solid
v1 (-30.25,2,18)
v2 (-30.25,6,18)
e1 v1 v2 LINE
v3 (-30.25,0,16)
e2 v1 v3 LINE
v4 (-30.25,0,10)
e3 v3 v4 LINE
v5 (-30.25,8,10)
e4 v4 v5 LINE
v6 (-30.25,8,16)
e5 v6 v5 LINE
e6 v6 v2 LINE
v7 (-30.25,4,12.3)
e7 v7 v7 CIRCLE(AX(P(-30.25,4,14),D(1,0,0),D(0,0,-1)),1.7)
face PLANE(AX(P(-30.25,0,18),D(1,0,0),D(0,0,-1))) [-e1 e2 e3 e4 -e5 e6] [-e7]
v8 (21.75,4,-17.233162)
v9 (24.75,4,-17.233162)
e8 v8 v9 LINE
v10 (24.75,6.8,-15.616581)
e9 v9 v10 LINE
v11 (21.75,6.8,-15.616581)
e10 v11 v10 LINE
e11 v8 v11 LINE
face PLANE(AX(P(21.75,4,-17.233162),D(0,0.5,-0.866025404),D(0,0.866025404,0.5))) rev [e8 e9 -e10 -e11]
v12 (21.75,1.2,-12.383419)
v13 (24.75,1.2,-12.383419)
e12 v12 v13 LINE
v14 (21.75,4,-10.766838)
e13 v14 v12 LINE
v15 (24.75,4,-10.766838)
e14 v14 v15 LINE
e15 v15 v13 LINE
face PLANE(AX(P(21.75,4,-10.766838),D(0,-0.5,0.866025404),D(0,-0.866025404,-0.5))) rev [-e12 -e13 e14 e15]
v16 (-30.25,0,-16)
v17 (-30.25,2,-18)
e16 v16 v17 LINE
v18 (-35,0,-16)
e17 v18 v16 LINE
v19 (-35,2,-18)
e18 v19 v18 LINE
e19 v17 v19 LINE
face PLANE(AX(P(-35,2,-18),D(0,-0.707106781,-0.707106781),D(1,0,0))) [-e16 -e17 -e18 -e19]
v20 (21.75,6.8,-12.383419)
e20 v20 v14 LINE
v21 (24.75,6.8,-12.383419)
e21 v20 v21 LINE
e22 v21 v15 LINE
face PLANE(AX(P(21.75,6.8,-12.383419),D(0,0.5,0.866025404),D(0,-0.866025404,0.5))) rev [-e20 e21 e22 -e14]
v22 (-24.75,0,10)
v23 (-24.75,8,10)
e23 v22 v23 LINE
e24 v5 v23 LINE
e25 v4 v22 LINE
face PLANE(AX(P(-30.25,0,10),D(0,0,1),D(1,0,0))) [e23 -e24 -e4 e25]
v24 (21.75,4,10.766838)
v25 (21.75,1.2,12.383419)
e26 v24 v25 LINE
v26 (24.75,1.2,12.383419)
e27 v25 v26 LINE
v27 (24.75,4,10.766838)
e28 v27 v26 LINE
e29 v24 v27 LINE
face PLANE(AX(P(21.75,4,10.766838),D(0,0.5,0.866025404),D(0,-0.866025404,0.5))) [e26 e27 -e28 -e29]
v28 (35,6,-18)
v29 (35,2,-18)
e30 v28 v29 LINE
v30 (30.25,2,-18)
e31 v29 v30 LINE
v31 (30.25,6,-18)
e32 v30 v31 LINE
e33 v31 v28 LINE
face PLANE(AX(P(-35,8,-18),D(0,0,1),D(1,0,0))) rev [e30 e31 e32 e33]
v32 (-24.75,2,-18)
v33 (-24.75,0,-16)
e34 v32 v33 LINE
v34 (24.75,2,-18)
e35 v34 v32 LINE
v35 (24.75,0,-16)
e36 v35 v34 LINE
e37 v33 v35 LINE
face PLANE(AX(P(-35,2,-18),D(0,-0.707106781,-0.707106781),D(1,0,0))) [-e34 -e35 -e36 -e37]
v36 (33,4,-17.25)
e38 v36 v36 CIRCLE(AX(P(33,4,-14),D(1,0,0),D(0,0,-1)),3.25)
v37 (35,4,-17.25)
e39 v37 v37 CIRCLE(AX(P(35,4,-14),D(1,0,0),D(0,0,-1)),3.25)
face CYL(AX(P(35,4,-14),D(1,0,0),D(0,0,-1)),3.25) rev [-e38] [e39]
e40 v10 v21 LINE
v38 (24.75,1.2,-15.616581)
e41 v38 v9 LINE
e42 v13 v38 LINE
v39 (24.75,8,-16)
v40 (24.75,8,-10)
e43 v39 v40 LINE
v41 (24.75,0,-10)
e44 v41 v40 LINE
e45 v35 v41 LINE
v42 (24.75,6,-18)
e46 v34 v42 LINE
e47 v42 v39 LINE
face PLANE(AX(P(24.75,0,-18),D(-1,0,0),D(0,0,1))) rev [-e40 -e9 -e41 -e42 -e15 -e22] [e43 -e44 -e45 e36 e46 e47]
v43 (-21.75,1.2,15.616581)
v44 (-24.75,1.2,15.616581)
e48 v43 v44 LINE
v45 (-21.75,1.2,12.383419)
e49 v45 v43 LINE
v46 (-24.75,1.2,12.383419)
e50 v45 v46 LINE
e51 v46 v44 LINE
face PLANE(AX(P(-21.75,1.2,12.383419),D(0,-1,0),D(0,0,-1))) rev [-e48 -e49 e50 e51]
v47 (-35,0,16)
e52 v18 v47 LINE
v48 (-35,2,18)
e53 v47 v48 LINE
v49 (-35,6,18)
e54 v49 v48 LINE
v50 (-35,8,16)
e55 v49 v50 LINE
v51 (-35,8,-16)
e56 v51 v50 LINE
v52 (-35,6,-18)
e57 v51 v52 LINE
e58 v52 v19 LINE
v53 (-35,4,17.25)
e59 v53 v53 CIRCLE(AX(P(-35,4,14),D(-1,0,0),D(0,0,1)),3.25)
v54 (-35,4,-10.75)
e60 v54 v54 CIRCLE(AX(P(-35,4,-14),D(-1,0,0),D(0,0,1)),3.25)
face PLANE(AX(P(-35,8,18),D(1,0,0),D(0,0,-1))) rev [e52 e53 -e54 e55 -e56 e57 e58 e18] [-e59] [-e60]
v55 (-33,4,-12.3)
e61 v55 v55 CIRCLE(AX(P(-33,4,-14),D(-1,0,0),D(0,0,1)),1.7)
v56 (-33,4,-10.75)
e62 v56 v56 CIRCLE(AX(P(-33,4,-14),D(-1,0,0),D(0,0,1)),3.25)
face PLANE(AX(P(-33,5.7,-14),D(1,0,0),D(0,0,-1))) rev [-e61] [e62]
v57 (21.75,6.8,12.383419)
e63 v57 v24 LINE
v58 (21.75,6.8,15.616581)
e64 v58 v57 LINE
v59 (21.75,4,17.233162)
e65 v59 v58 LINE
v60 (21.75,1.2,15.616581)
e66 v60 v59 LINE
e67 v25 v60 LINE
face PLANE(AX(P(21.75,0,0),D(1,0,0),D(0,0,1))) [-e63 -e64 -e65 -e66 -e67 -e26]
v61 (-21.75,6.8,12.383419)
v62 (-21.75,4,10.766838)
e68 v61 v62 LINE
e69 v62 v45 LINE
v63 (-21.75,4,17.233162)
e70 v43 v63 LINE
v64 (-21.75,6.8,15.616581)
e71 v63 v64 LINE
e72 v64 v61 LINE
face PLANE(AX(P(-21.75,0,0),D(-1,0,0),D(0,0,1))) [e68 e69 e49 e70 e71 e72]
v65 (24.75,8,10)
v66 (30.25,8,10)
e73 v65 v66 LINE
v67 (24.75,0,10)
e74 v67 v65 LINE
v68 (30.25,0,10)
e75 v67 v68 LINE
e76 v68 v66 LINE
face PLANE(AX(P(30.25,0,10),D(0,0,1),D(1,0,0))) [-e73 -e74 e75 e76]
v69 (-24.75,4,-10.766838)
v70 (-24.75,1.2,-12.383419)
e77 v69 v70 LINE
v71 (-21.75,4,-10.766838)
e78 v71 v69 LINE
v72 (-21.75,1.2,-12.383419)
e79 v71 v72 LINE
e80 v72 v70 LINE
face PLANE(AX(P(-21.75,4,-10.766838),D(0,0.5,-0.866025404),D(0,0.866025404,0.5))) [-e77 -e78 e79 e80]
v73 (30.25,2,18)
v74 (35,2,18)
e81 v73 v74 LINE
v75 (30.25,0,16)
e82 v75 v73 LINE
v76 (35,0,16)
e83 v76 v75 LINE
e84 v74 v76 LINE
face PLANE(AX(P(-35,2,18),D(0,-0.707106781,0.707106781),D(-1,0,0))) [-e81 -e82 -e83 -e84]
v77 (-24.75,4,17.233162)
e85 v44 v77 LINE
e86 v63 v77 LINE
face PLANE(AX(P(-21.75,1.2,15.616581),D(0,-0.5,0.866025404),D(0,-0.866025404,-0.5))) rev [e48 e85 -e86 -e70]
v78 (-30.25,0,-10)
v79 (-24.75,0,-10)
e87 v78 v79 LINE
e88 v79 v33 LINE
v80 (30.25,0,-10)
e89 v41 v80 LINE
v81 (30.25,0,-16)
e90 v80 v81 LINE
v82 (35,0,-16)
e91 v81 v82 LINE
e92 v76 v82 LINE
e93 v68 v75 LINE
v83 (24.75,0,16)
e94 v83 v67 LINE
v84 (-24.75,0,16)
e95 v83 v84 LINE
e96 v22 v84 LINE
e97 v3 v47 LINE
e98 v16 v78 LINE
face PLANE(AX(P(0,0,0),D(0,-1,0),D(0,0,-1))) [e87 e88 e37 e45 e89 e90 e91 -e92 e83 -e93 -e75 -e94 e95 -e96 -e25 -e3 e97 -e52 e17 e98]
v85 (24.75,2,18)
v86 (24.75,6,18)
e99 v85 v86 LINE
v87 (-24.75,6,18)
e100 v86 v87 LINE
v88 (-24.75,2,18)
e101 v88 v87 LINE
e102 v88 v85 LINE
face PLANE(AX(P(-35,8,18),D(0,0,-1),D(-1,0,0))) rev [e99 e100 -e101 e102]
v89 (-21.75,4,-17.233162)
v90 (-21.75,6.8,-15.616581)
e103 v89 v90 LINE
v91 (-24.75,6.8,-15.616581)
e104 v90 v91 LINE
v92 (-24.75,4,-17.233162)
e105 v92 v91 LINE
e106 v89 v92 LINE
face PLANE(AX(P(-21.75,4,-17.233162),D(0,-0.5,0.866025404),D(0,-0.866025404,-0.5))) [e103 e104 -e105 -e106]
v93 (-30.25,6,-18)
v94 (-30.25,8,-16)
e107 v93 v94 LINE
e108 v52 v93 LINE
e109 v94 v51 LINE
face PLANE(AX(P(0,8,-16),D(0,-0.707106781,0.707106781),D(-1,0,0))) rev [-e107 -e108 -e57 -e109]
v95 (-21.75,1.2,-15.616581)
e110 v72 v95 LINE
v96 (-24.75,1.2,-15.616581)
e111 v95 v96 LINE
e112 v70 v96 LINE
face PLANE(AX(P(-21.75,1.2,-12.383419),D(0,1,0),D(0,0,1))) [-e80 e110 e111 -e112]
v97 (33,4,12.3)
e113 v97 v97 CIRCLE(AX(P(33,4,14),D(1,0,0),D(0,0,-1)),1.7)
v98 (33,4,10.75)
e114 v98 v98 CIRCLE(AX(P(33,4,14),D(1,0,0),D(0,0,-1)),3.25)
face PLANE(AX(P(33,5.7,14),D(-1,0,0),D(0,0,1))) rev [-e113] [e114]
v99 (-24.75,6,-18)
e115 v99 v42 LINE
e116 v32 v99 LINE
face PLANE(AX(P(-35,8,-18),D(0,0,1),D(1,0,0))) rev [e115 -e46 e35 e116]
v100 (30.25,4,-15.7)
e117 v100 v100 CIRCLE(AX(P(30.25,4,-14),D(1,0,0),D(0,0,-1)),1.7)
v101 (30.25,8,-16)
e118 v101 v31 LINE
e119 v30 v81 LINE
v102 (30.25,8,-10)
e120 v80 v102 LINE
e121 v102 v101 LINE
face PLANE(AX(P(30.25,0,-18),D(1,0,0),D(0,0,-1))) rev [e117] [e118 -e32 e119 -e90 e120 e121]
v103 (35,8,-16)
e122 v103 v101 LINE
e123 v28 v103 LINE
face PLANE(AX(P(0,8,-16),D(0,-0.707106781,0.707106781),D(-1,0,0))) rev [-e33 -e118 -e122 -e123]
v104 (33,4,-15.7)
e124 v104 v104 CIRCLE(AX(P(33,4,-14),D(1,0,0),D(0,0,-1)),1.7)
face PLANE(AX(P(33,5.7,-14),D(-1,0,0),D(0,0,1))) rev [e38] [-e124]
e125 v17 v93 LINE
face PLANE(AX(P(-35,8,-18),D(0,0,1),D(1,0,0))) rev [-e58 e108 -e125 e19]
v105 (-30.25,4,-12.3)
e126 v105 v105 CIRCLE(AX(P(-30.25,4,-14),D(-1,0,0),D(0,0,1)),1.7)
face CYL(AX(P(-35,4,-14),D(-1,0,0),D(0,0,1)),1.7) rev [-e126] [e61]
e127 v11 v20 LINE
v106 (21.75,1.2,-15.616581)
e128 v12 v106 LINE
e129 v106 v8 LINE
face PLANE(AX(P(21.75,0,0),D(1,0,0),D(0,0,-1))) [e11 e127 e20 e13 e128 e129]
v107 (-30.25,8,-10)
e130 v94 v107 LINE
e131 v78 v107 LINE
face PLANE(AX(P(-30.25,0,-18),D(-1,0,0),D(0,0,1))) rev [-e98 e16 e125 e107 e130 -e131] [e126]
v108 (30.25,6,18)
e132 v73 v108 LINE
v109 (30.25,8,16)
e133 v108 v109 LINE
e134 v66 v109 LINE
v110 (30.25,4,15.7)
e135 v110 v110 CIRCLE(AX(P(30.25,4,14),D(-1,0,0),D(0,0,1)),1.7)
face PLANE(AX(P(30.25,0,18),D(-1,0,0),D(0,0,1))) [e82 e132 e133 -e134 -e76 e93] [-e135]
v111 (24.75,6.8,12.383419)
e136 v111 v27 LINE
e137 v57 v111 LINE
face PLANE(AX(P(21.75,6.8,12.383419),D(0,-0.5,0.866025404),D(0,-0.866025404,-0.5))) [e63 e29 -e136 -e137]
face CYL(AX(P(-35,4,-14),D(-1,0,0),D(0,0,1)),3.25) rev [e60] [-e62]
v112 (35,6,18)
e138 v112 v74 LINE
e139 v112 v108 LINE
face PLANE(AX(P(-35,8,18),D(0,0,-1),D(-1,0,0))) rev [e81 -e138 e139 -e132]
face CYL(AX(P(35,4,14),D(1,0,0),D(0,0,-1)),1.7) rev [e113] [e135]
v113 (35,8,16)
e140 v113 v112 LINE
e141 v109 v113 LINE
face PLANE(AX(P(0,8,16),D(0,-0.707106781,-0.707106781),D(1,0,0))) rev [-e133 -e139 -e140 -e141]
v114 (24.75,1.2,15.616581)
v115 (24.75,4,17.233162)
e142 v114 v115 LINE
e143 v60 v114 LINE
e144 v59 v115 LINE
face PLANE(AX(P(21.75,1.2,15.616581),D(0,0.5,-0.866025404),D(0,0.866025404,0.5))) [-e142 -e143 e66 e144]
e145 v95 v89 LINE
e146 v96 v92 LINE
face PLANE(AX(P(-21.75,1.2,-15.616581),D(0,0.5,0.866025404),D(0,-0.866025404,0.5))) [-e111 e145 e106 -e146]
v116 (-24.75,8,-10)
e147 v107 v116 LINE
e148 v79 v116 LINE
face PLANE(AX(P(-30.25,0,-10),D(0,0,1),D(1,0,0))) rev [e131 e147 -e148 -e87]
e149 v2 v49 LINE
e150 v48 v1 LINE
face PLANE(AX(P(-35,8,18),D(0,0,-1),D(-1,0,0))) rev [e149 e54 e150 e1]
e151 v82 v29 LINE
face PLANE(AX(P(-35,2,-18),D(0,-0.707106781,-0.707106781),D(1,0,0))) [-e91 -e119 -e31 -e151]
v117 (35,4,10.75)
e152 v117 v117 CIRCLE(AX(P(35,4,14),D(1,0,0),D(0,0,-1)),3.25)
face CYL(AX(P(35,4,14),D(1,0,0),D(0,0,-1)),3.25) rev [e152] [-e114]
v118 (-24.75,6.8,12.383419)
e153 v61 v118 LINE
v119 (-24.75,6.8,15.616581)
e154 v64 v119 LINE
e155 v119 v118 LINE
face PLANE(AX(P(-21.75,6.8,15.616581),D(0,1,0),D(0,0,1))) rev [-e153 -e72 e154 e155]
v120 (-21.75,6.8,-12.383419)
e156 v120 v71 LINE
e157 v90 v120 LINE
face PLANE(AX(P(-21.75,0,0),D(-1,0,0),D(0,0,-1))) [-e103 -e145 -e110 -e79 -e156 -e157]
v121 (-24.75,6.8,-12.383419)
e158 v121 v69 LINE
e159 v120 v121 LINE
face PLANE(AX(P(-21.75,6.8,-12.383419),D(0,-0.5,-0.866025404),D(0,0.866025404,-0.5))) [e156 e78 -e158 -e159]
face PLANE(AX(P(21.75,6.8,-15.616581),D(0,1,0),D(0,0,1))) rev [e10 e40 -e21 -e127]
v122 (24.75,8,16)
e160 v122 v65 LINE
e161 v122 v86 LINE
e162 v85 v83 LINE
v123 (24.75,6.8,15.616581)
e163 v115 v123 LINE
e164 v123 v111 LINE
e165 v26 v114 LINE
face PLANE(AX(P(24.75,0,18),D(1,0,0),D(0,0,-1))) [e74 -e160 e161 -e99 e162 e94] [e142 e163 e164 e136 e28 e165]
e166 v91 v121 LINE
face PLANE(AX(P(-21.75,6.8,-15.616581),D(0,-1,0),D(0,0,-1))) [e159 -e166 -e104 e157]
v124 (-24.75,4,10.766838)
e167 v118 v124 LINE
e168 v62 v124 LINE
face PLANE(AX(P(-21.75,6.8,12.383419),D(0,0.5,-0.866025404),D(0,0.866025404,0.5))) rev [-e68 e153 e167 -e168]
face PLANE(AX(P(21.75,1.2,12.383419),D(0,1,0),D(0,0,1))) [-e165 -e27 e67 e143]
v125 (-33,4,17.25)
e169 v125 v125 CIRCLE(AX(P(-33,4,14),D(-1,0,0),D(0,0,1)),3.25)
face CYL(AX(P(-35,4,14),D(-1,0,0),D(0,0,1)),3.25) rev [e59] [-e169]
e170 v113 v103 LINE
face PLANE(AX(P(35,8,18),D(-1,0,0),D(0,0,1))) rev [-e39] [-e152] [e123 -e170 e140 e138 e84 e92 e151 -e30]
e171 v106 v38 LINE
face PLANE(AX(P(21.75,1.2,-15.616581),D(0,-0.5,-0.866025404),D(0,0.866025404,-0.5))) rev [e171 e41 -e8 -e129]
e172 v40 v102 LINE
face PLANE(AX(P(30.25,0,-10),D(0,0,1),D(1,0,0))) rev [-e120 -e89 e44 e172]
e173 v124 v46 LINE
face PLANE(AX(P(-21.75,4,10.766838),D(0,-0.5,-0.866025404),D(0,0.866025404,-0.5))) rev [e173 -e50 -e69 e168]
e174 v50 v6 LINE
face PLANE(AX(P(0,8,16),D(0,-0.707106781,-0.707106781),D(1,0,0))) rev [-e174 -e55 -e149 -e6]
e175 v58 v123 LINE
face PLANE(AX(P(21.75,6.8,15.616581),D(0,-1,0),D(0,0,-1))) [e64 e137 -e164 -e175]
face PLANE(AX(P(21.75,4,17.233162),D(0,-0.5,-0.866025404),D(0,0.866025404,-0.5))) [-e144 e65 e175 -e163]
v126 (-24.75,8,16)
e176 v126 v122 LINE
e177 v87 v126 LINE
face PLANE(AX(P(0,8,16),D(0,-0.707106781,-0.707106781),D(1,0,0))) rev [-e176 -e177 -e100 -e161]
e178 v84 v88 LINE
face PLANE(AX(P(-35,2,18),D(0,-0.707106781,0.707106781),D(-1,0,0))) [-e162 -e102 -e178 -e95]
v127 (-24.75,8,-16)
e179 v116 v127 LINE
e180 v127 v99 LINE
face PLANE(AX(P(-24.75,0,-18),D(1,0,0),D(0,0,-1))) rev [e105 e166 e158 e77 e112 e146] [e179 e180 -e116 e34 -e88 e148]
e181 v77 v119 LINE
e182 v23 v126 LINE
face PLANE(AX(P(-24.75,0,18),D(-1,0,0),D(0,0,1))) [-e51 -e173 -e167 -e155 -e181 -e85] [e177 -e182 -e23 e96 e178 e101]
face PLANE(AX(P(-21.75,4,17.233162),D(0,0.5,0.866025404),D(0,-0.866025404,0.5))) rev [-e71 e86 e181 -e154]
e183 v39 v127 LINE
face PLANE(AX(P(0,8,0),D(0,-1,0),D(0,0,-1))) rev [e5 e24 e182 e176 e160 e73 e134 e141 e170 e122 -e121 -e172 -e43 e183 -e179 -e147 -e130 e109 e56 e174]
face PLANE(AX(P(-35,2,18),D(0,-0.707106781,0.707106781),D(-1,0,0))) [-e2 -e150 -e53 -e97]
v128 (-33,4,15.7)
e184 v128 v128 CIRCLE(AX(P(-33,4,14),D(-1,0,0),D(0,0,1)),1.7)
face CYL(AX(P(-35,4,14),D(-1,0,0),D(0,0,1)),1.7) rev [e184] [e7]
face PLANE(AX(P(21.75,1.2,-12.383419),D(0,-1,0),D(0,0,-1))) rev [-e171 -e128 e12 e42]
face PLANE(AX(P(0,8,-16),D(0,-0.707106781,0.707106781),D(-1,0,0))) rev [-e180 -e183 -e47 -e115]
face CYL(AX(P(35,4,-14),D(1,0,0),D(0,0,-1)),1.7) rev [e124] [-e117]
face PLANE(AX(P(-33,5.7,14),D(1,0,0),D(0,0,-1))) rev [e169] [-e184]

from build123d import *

# Parameters (mm, degrees)
SKETCH1_W                                  = 70
SKETCH1_H                                  = 36
BOSS_EXTRUDE1_DEPTH                        = 8
SKETCH2_W                                  = 5.5
SKETCH2_H                                  = 8
CUT_EXTRUDE1_DEPTH                         = 41.162171256
CBORE_START                                = 33
CBORE_FOR_M3_CHEESE_HEAD_SCREW1_OUTLINE_R  = 3.25
CBORE_FOR_M3_CHEESE_HEAD_SCREW1_DEPTH      = 2
CBORE_START_2                              = 30.25
CBORE_FOR_M3_CHEESE_HEAD_SCREW1_2_OUTLIN_R = 1.7
CBORE_FOR_M3_CHEESE_HEAD_SCREW1_2_DEPTH    = 2.75
CUT_EXTRUDE2_DEPTH                         = 3
MIRROR2_START                              = 33
MIRROR2_COPY_1_SKETCH_R                    = 3.25
MIRROR2_COPY_1_DEPTH                       = 2
MIRROR2_START_2                            = 30.25
MIRROR2_COPY_2_SKETCH_R                    = 1.7
MIRROR2_COPY_2_DEPTH                       = 2.75
MIRROR2_COPY_3_DEPTH                       = 3
MIRROR2_COPY_4_SKETCH_R                    = 1.7
MIRROR2_COPY_4_DEPTH                       = 2.75
CHAMFER1_SIZE                              = 2


# Read off the part's stored shape, not the designer's step: CBORE for M3 Cheese Head Screw1
with BuildPart() as part:
    # Sketch1 → Boss-Extrude1 (new body)
    with BuildSketch(Plane(origin=(0, 0, 0), x_dir=(1, 0, 0), z_dir=(0, 1, 0))):
        Rectangle(SKETCH1_W, SKETCH1_H)
    extrude(amount=BOSS_EXTRUDE1_DEPTH)

    # Sketch2 → Cut-Extrude1 (cut, through all)
    with BuildSketch(Plane(origin=(0, 8, 0), x_dir=(1, 0, 0), z_dir=(0, 1, 0))):
        with Locations((-27.5, 14)):
            Rectangle(SKETCH2_W, SKETCH2_H)
        with Locations((27.5, 14)):
            Rectangle(SKETCH2_W, SKETCH2_H)
    cut_extrude1 = extrude(amount=-CUT_EXTRUDE1_DEPTH, mode=Mode.SUBTRACT)

    # CBORE for M3 Cheese Head Screw1 outline → CBORE for M3 Cheese Head Screw1 (cut)
    with BuildSketch(Plane.YZ.offset(CBORE_START)):
        with Locations((4, -14)):
            Circle(CBORE_FOR_M3_CHEESE_HEAD_SCREW1_OUTLINE_R)
    cbore_for_m3_cheese_head_screw1 = extrude(amount=CBORE_FOR_M3_CHEESE_HEAD_SCREW1_DEPTH, mode=Mode.SUBTRACT)

    # CBORE for M3 Cheese Head Screw1 2 outlin → CBORE for M3 Cheese Head Screw1 2 (cut)
    with BuildSketch(Plane.YZ.offset(CBORE_START_2)):
        with Locations((4, -14)):
            Circle(CBORE_FOR_M3_CHEESE_HEAD_SCREW1_2_OUTLIN_R)
    cbore_for_m3_cheese_head_screw1_2 = extrude(amount=CBORE_FOR_M3_CHEESE_HEAD_SCREW1_2_DEPTH, mode=Mode.SUBTRACT)

    # Sketch9 → Cut-Extrude2 (cut)
    with BuildSketch(Plane(origin=(24.75, 0, 0), x_dir=(0, 0, -1), z_dir=(1, 0, 0))):
        Polygon((15.616580754, 6.8), (12.383419246, 6.8), (10.766838493, 4), (12.383419246, 1.2), (15.616580754, 1.2), (17.233161507, 4), align=None)
    cut_extrude2 = extrude(amount=-CUT_EXTRUDE2_DEPTH, mode=Mode.SUBTRACT)

    # Mirror1: CBORE for M3 Cheese Head Screw1, CBORE for M3 Cheese Head Screw1 2, Cut-Extrude2 across plane
    add(cbore_for_m3_cheese_head_screw1.mirror(Plane(origin=(0, 0, 0), x_dir=(0, 0, 1), z_dir=(1, 0, 0))), mode=Mode.SUBTRACT)
    add(cbore_for_m3_cheese_head_screw1_2.mirror(Plane(origin=(0, 0, 0), x_dir=(0, 0, 1), z_dir=(1, 0, 0))), mode=Mode.SUBTRACT)
    add(cut_extrude2.mirror(Plane(origin=(0, 0, 0), x_dir=(0, 0, 1), z_dir=(1, 0, 0))), mode=Mode.SUBTRACT)

    # Mirror2: Cut-Extrude1, CBORE for M3 Cheese Head Screw1, CBORE for M3 Cheese Head Screw1 2, Cut-Extrude2 across plane
    add(cut_extrude1.mirror(Plane.XY), mode=Mode.SUBTRACT)
    add(cbore_for_m3_cheese_head_screw1.mirror(Plane.XY), mode=Mode.SUBTRACT)
    add(cbore_for_m3_cheese_head_screw1_2.mirror(Plane.XY), mode=Mode.SUBTRACT)
    add(cut_extrude2.mirror(Plane.XY), mode=Mode.SUBTRACT)

    # Mirror2 copy 1 sketch → Mirror2 copy 1 (cut)
    with BuildSketch(Plane(origin=(0, 0, 0), x_dir=(0, 1, 0), z_dir=(-1, 0, 0)).offset(MIRROR2_START)):
        with Locations((4, -14)):
            Circle(MIRROR2_COPY_1_SKETCH_R)
    extrude(amount=MIRROR2_COPY_1_DEPTH, mode=Mode.SUBTRACT)

    # Mirror2 copy 2 sketch → Mirror2 copy 2 (cut)
    with BuildSketch(Plane(origin=(0, 0, 0), x_dir=(0, 1, 0), z_dir=(-1, 0, 0)).offset(MIRROR2_START_2)):
        with Locations((4, -14)):
            Circle(MIRROR2_COPY_2_SKETCH_R)
    extrude(amount=MIRROR2_COPY_2_DEPTH, mode=Mode.SUBTRACT)

    # Mirror2 copy 3 sketch → Mirror2 copy 3 (cut)
    with BuildSketch(Plane.ZY.offset(24.75)):
        Polygon((15.616580754, 6.8), (12.383419246, 6.8), (10.766838493, 4), (12.383419246, 1.2), (15.616580754, 1.2), (17.233161507, 4), align=None)
    extrude(amount=-MIRROR2_COPY_3_DEPTH, mode=Mode.SUBTRACT)

    # Mirror2 copy 4 sketch → Mirror2 copy 4 (cut)
    with BuildSketch(Plane.YZ.offset(MIRROR2_START_2)):
        with Locations((4, 14)):
            Circle(MIRROR2_COPY_4_SKETCH_R)
    extrude(amount=MIRROR2_COPY_4_DEPTH, mode=Mode.SUBTRACT)

    # Chamfer1
    chamfer1_edges = [part.edges().sort_by_distance(p)[0] for p in [
        (32.625, 0, 18),
        (32.625, 8, 18),
        (-32.625, 8, 18),
        (-32.625, 0, -18),
        (-32.625, 8, -18),
        (0, 0, -18),
        (0, 8, -18),
        (-32.625, 0, 18),
        (32.625, 0, -18),
        (32.625, 8, -18),
        (0, 0, 18),
        (0, 8, 18),
    ]]
    chamfer(chamfer1_edges, length=CHAMFER1_SIZE)


solid = part.part
